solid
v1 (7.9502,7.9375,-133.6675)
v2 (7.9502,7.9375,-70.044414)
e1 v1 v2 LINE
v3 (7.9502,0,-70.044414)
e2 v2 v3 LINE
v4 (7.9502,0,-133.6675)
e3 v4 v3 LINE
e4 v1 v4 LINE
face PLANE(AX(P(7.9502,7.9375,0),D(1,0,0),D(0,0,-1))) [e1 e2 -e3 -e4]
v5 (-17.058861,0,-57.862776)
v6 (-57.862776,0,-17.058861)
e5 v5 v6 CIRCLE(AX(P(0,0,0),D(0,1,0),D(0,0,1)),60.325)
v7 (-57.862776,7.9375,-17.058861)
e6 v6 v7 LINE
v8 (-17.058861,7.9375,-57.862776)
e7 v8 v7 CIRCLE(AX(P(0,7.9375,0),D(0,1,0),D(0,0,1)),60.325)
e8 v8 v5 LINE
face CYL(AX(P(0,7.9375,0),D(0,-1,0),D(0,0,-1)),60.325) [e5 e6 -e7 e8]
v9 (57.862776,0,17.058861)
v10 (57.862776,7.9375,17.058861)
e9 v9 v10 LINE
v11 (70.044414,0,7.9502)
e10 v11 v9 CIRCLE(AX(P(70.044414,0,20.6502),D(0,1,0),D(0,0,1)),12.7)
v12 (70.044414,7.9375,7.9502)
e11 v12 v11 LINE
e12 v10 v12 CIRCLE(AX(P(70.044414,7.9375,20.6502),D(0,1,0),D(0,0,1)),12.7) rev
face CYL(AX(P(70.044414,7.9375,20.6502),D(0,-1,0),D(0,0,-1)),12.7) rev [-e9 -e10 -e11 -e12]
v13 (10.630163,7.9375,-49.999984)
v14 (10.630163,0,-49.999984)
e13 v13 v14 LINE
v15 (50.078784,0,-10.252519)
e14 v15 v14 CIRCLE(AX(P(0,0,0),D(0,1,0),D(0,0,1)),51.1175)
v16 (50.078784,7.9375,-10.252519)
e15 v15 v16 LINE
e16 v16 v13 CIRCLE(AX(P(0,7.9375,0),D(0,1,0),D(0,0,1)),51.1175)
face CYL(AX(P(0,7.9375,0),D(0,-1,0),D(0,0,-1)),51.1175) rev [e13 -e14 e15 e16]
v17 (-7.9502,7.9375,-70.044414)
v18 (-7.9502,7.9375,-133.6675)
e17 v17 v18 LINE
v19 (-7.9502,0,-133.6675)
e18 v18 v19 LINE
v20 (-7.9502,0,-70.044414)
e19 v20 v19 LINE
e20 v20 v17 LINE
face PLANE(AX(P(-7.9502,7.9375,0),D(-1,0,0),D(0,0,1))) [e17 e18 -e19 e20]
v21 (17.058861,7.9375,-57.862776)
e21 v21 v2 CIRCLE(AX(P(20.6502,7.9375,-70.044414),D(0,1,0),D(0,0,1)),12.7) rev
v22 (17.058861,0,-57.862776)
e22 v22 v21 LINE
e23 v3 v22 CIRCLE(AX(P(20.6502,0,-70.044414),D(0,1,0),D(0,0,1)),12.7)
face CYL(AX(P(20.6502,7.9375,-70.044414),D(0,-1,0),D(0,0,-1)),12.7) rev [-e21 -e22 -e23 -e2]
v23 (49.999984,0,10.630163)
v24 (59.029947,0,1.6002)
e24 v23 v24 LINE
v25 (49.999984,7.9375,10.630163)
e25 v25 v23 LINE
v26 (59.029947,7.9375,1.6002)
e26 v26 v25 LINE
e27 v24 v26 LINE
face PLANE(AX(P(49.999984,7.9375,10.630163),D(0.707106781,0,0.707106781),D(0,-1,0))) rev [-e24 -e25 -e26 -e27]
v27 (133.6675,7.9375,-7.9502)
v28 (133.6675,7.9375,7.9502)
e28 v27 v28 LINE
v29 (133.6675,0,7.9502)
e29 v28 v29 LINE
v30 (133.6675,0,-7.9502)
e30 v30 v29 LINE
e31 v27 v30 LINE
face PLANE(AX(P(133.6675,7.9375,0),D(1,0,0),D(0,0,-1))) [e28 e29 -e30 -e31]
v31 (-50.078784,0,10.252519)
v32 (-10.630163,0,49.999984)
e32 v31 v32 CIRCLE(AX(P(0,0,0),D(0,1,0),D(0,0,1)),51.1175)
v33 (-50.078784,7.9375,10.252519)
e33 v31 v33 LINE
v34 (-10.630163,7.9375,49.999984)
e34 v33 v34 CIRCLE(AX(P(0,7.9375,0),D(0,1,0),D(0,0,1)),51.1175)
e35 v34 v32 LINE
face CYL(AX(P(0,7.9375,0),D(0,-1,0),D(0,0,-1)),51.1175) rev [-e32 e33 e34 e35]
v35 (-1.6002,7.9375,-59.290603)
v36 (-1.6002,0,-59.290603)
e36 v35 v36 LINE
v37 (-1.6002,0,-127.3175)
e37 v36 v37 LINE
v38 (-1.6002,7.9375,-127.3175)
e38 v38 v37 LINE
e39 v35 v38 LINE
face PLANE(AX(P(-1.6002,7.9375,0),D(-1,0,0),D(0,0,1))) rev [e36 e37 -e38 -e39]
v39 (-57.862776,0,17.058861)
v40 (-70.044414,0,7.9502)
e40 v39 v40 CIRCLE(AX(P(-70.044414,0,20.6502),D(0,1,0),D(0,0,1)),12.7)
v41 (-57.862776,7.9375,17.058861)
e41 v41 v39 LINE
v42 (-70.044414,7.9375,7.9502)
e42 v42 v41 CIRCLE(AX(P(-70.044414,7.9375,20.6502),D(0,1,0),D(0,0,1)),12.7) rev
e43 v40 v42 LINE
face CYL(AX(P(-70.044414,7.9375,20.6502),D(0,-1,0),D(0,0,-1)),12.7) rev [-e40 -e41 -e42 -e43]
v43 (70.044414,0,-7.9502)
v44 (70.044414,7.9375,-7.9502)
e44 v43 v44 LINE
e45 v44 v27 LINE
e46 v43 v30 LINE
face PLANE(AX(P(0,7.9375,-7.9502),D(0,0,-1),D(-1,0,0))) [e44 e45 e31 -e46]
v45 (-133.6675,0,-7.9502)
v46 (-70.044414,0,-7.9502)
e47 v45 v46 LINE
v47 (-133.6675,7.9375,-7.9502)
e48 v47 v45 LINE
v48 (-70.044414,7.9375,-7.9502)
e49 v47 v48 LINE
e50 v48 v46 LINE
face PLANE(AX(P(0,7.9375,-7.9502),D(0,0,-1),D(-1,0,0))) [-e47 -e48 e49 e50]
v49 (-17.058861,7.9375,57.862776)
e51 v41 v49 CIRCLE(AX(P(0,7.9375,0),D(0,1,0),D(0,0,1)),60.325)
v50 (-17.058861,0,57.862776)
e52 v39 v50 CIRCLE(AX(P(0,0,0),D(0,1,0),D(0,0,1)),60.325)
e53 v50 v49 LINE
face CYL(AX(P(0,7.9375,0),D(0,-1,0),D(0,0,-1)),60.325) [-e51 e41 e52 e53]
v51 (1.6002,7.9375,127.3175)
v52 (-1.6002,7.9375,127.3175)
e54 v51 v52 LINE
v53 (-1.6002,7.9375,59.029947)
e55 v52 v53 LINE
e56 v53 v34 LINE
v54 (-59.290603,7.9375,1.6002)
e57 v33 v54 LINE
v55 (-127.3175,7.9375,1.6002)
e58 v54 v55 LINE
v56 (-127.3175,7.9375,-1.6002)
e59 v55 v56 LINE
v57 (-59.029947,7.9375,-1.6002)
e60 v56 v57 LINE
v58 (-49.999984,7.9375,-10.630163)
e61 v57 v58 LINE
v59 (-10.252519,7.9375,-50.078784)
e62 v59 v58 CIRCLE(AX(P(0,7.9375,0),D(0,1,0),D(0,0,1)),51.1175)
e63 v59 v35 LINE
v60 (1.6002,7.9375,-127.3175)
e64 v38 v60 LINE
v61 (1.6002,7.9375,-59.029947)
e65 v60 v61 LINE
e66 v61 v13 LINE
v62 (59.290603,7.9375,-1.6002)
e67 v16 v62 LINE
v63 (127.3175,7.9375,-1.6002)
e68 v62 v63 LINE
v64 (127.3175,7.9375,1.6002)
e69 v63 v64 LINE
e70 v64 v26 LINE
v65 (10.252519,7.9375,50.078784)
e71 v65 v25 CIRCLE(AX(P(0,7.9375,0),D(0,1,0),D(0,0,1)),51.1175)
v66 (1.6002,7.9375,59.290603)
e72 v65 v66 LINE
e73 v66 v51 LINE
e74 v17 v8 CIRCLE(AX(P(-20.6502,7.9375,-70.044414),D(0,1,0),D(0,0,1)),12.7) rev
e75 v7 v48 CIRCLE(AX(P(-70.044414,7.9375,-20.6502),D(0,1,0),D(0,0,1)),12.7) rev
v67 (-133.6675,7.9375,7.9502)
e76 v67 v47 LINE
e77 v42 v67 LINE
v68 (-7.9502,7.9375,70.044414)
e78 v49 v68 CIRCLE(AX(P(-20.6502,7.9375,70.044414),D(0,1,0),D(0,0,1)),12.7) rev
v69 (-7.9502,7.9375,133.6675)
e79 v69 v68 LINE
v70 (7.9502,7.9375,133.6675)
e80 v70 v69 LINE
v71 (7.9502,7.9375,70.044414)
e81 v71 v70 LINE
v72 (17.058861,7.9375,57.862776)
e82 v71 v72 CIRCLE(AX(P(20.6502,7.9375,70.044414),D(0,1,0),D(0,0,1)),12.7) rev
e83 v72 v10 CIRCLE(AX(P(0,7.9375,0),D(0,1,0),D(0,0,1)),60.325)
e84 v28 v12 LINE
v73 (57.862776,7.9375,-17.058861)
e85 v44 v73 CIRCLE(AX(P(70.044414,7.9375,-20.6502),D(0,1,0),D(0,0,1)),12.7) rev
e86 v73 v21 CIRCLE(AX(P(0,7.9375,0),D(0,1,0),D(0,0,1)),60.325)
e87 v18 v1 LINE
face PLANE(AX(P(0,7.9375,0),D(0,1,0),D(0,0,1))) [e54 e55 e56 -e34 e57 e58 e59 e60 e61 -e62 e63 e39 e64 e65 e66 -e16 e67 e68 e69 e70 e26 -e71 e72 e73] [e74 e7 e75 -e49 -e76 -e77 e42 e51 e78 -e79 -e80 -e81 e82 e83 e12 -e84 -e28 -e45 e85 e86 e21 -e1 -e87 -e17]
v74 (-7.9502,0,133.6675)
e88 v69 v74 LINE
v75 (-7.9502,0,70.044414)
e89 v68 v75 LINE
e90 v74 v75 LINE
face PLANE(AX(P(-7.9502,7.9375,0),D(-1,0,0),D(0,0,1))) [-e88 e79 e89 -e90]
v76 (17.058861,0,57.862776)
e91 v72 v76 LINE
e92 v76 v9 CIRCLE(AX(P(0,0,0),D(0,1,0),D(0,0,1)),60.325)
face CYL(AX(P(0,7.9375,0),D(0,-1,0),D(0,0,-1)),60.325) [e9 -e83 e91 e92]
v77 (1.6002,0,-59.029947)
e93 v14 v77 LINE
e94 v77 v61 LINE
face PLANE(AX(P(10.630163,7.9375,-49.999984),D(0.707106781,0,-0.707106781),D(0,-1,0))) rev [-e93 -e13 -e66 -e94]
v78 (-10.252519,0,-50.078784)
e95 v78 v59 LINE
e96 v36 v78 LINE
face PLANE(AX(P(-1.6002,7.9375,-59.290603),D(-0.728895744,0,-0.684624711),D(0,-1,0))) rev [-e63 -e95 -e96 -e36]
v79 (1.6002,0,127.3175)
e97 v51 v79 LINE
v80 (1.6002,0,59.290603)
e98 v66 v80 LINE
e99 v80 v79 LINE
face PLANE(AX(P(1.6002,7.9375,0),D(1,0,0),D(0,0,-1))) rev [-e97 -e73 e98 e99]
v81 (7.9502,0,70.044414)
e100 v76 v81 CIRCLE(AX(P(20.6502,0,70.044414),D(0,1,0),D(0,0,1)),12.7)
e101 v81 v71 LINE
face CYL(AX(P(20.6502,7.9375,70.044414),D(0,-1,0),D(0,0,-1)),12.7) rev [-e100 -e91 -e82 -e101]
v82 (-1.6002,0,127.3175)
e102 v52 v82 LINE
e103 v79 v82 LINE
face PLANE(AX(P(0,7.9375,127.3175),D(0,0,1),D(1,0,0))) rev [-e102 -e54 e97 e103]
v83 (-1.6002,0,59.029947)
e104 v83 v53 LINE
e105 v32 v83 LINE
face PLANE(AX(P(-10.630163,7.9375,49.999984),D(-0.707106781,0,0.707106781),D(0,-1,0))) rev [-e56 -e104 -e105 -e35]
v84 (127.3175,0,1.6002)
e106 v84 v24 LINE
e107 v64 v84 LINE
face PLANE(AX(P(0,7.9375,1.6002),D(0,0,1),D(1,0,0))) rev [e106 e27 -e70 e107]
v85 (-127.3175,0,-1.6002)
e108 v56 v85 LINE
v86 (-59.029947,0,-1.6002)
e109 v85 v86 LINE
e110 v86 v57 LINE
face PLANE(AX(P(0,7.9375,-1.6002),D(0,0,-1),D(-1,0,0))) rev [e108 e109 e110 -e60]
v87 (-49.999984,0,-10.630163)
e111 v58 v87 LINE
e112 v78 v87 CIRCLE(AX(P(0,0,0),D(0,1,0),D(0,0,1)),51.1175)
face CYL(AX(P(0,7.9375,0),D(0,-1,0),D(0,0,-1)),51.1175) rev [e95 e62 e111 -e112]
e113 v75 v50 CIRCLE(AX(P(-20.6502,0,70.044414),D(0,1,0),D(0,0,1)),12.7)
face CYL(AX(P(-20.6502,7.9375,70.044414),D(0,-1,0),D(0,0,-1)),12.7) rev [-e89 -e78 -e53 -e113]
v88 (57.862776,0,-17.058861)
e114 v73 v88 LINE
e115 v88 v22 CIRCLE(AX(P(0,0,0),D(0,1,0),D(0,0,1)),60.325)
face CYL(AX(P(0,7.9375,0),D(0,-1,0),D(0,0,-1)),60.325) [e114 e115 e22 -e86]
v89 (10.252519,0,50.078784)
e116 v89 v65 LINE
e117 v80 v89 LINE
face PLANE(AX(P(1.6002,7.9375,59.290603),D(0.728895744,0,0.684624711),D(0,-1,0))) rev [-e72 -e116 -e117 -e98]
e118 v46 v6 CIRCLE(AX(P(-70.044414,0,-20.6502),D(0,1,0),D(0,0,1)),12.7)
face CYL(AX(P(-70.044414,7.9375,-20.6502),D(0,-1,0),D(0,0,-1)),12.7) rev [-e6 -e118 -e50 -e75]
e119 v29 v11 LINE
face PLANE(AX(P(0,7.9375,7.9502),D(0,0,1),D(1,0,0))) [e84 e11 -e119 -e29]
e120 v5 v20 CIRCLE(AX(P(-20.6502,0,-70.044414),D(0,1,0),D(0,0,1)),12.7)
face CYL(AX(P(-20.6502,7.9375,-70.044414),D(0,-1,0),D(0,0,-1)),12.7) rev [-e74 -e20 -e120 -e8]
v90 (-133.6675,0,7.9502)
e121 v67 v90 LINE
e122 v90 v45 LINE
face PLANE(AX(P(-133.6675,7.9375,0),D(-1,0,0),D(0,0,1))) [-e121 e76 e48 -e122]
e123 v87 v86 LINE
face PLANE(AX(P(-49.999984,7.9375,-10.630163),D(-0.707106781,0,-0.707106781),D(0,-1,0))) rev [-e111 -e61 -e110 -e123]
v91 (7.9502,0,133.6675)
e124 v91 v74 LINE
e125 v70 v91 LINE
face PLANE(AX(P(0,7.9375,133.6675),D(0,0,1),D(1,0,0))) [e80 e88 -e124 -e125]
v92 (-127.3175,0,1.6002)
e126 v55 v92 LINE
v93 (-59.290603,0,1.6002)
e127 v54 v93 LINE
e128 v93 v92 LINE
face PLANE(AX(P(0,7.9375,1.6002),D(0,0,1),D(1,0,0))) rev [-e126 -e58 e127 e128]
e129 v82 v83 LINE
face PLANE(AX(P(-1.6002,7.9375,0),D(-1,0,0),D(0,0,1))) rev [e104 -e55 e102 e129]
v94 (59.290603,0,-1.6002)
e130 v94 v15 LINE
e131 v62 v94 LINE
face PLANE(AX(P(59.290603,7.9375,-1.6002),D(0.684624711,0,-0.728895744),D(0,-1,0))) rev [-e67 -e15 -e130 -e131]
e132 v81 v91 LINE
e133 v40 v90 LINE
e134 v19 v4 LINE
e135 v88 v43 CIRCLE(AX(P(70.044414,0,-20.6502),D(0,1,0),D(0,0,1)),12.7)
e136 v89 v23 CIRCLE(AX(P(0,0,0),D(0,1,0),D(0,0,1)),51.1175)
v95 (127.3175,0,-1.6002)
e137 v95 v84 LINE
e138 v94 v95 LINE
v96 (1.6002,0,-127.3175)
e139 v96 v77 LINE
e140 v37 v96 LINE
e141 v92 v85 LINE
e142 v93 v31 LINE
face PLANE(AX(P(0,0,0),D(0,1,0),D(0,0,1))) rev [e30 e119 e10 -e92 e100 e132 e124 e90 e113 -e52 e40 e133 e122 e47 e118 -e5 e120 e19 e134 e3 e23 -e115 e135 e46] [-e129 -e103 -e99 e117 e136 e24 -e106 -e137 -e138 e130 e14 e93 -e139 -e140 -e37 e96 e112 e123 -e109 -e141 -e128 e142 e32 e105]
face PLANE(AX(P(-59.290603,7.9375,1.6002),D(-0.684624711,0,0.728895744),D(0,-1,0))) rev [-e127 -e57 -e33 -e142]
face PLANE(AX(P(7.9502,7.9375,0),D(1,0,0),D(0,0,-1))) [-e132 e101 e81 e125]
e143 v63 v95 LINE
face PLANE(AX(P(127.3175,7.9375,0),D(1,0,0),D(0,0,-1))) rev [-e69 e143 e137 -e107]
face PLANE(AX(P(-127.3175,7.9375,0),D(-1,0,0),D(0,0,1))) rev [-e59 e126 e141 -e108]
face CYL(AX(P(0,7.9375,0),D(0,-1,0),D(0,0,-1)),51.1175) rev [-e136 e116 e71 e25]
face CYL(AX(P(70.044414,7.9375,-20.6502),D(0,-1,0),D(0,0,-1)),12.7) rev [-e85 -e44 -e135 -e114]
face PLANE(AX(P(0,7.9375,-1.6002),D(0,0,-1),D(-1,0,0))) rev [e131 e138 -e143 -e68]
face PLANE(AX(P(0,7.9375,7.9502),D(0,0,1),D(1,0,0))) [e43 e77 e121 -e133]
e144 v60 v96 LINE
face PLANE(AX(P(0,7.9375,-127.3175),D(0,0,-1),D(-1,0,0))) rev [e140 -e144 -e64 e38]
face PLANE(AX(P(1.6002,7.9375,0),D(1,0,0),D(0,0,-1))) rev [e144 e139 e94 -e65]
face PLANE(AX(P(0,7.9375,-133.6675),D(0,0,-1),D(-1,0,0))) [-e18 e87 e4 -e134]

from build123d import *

# Parameters (mm, degrees)
BOSS_EXTRUDE1_DEPTH = 7.9375
FILLET2_R           = 12.7
CHAMFER1_SIZE       = 8.198155848
CHAMFER1_SIZE_2     = 7.9375


with BuildPart() as part:
    # Sketch1 → Boss-Extrude1 (new body)
    with BuildSketch(Plane(origin=(0, 0, 0), x_dir=(1, 0, 0), z_dir=(0, 1, 0))):
        with BuildLine():
            Line((-7.9502, 133.6675), (7.9502, 133.6675))
            Line((7.9502, 133.6675), (7.9502, 59.79882896))
            ThreePointArc((7.9502, 59.79882896), (42.656216575, 42.656216575), (59.79882896, 7.9502))
            Line((59.79882896, 7.9502), (133.6675, 7.9502))
            Line((133.6675, 7.9502), (133.6675, -7.9502))
            Line((133.6675, -7.9502), (59.79882896, -7.9502))
            ThreePointArc((59.79882896, -7.9502), (42.656216575, -42.656216575), (7.9502, -59.79882896))
            Line((7.9502, -59.79882896), (7.9502, -133.6675))
            Line((7.9502, -133.6675), (-7.9502, -133.6675))
            Line((-7.9502, -133.6675), (-7.9502, -59.79882896))
            ThreePointArc((-7.9502, -59.79882896), (-42.656216575, -42.656216575), (-59.79882896, -7.9502))
            Line((-59.79882896, -7.9502), (-133.6675, -7.9502))
            Line((-133.6675, -7.9502), (-133.6675, 7.9502))
            Line((-133.6675, 7.9502), (-59.79882896, 7.9502))
            ThreePointArc((-59.79882896, 7.9502), (-42.656216575, 42.656216575), (-7.9502, 59.79882896))
            Line((-7.9502, 59.79882896), (-7.9502, 133.6675))
        make_face()
        with BuildLine():
            Line((-1.6002, 51.092447252), (-1.6002, 127.3175))
            Line((-1.6002, 127.3175), (1.6002, 127.3175))
            Line((1.6002, 127.3175), (1.6002, 51.092447252))
            ThreePointArc((1.6002, 51.092447252), (36.145530887, 36.145530887), (51.092447252, 1.6002))
            Line((51.092447252, 1.6002), (127.3175, 1.6002))
            Line((127.3175, 1.6002), (127.3175, -1.6002))
            Line((127.3175, -1.6002), (51.092447252, -1.6002))
            ThreePointArc((51.092447252, -1.6002), (36.145530887, -36.145530887), (1.6002, -51.092447252))
            Line((1.6002, -51.092447252), (1.6002, -127.3175))
            Line((1.6002, -127.3175), (-1.6002, -127.3175))
            Line((-1.6002, -127.3175), (-1.6002, -51.092447252))
            ThreePointArc((-1.6002, -51.092447252), (-36.145530887, -36.145530887), (-51.092447252, -1.6002))
            Line((-51.092447252, -1.6002), (-127.3175, -1.6002))
            Line((-127.3175, -1.6002), (-127.3175, 1.6002))
            Line((-127.3175, 1.6002), (-51.092447252, 1.6002))
            ThreePointArc((-51.092447252, 1.6002), (-36.145530887, 36.145530887), (-1.6002, 51.092447252))
        make_face(mode=Mode.SUBTRACT)
    extrude(amount=BOSS_EXTRUDE1_DEPTH)

    # Fillet2
    fillet2_edges = [part.edges().sort_by_distance(p)[0] for p in [
        (59.79882896, 3.96875, 7.9502),
        (7.9502, 3.96875, 59.79882896),
        (-7.9502, 3.96875, 59.79882896),
        (-59.79882896, 3.96875, 7.9502),
        (-59.79882896, 3.96875, -7.9502),
        (-7.9502, 3.96875, -59.79882896),
        (7.9502, 3.96875, -59.79882896),
        (59.79882896, 3.96875, -7.9502),
    ]]
    fillet(fillet2_edges, radius=FILLET2_R)

    # Chamfer1
    # the kernel refuses this chamfer: 8.198155848, 7.9375 mm, written as the material it takes off along each edge
    with BuildSketch(Plane(origin=(-1.6002, -22.411946767, -51.092447252), x_dir=(-0.9932071944131365, 0, 0.11635922381137723), z_dir=(0, 1, 0))) as chamfer1_piece_1:
        with BuildLine():
            Line((8.711494705, 0), (-CHAMFER1_SIZE * 0.116359223814, -CHAMFER1_SIZE * 0.993207194436))
            Line((-CHAMFER1_SIZE * 0.116359223814, -CHAMFER1_SIZE * 0.993207194436), (0, 0))
            ThreePointArc((0, 0), (4.4818633, -0.185760204), (8.711494705, 0))
        make_face()
    extrude(amount=52.761393535, mode=Mode.SUBTRACT)
    with BuildSketch(Plane(origin=(-51.092447252, -23.390114348, -1.6002), x_dir=(0.12010619986132272, 0, -0.9927610491728973), z_dir=(0, 1, 0)), Plane(origin=(-1.6002, -23.390114348, 51.092447252), x_dir=(-0.9927610491728978, 0, -0.12010619986131951), z_dir=(0, 1, 0)), Plane(origin=(51.092447252, -23.390114348, 1.6002), x_dir=(-0.12010619986131572, 0, 0.9927610491728983), z_dir=(0, 1, 0)), Plane(origin=(1.6002, -23.390114348, -51.092447252), x_dir=(0.9927610491728988, 0, 0.12010619986131156), z_dir=(0, 1, 0))) as chamfer1_piece_2:
        with BuildLine():
            Line((9.0958069, 0), (-CHAMFER1_SIZE_2 * 0.120106199861, CHAMFER1_SIZE_2 * 0.992761049173))
            Line((-CHAMFER1_SIZE_2 * 0.120106199861, CHAMFER1_SIZE_2 * 0.992761049173), (0, 0))
            ThreePointArc((0, 0), (4.677699861, 0.202549732), (9.0958069, 0))
        make_face()
    extrude(amount=54.717728697, mode=Mode.SUBTRACT)
    with BuildSketch(Plane(origin=(-51.092447252, -22.411946767, 1.6002), x_dir=(-1, 0, 0), z_dir=(0, 1, 0)), Plane(origin=(1.6002, -22.411946767, 51.092447252), x_dir=(0, 0, 1), z_dir=(0, 1, 0)), Plane(origin=(51.092447252, -22.411946767, -1.6002), x_dir=(1, 0, 0), z_dir=(0, 1, 0))) as chamfer1_piece_3:
        with BuildLine():
            Line((CHAMFER1_SIZE, 0), (-1.013662762, 8.652319215))
            ThreePointArc((-1.013662762, 8.652319215), (-0.337007764, 4.473033787), (0, 0))
            Line((0, 0), (CHAMFER1_SIZE, 0))
        make_face()
    extrude(amount=52.761393535, mode=Mode.SUBTRACT)


solid = part.part
